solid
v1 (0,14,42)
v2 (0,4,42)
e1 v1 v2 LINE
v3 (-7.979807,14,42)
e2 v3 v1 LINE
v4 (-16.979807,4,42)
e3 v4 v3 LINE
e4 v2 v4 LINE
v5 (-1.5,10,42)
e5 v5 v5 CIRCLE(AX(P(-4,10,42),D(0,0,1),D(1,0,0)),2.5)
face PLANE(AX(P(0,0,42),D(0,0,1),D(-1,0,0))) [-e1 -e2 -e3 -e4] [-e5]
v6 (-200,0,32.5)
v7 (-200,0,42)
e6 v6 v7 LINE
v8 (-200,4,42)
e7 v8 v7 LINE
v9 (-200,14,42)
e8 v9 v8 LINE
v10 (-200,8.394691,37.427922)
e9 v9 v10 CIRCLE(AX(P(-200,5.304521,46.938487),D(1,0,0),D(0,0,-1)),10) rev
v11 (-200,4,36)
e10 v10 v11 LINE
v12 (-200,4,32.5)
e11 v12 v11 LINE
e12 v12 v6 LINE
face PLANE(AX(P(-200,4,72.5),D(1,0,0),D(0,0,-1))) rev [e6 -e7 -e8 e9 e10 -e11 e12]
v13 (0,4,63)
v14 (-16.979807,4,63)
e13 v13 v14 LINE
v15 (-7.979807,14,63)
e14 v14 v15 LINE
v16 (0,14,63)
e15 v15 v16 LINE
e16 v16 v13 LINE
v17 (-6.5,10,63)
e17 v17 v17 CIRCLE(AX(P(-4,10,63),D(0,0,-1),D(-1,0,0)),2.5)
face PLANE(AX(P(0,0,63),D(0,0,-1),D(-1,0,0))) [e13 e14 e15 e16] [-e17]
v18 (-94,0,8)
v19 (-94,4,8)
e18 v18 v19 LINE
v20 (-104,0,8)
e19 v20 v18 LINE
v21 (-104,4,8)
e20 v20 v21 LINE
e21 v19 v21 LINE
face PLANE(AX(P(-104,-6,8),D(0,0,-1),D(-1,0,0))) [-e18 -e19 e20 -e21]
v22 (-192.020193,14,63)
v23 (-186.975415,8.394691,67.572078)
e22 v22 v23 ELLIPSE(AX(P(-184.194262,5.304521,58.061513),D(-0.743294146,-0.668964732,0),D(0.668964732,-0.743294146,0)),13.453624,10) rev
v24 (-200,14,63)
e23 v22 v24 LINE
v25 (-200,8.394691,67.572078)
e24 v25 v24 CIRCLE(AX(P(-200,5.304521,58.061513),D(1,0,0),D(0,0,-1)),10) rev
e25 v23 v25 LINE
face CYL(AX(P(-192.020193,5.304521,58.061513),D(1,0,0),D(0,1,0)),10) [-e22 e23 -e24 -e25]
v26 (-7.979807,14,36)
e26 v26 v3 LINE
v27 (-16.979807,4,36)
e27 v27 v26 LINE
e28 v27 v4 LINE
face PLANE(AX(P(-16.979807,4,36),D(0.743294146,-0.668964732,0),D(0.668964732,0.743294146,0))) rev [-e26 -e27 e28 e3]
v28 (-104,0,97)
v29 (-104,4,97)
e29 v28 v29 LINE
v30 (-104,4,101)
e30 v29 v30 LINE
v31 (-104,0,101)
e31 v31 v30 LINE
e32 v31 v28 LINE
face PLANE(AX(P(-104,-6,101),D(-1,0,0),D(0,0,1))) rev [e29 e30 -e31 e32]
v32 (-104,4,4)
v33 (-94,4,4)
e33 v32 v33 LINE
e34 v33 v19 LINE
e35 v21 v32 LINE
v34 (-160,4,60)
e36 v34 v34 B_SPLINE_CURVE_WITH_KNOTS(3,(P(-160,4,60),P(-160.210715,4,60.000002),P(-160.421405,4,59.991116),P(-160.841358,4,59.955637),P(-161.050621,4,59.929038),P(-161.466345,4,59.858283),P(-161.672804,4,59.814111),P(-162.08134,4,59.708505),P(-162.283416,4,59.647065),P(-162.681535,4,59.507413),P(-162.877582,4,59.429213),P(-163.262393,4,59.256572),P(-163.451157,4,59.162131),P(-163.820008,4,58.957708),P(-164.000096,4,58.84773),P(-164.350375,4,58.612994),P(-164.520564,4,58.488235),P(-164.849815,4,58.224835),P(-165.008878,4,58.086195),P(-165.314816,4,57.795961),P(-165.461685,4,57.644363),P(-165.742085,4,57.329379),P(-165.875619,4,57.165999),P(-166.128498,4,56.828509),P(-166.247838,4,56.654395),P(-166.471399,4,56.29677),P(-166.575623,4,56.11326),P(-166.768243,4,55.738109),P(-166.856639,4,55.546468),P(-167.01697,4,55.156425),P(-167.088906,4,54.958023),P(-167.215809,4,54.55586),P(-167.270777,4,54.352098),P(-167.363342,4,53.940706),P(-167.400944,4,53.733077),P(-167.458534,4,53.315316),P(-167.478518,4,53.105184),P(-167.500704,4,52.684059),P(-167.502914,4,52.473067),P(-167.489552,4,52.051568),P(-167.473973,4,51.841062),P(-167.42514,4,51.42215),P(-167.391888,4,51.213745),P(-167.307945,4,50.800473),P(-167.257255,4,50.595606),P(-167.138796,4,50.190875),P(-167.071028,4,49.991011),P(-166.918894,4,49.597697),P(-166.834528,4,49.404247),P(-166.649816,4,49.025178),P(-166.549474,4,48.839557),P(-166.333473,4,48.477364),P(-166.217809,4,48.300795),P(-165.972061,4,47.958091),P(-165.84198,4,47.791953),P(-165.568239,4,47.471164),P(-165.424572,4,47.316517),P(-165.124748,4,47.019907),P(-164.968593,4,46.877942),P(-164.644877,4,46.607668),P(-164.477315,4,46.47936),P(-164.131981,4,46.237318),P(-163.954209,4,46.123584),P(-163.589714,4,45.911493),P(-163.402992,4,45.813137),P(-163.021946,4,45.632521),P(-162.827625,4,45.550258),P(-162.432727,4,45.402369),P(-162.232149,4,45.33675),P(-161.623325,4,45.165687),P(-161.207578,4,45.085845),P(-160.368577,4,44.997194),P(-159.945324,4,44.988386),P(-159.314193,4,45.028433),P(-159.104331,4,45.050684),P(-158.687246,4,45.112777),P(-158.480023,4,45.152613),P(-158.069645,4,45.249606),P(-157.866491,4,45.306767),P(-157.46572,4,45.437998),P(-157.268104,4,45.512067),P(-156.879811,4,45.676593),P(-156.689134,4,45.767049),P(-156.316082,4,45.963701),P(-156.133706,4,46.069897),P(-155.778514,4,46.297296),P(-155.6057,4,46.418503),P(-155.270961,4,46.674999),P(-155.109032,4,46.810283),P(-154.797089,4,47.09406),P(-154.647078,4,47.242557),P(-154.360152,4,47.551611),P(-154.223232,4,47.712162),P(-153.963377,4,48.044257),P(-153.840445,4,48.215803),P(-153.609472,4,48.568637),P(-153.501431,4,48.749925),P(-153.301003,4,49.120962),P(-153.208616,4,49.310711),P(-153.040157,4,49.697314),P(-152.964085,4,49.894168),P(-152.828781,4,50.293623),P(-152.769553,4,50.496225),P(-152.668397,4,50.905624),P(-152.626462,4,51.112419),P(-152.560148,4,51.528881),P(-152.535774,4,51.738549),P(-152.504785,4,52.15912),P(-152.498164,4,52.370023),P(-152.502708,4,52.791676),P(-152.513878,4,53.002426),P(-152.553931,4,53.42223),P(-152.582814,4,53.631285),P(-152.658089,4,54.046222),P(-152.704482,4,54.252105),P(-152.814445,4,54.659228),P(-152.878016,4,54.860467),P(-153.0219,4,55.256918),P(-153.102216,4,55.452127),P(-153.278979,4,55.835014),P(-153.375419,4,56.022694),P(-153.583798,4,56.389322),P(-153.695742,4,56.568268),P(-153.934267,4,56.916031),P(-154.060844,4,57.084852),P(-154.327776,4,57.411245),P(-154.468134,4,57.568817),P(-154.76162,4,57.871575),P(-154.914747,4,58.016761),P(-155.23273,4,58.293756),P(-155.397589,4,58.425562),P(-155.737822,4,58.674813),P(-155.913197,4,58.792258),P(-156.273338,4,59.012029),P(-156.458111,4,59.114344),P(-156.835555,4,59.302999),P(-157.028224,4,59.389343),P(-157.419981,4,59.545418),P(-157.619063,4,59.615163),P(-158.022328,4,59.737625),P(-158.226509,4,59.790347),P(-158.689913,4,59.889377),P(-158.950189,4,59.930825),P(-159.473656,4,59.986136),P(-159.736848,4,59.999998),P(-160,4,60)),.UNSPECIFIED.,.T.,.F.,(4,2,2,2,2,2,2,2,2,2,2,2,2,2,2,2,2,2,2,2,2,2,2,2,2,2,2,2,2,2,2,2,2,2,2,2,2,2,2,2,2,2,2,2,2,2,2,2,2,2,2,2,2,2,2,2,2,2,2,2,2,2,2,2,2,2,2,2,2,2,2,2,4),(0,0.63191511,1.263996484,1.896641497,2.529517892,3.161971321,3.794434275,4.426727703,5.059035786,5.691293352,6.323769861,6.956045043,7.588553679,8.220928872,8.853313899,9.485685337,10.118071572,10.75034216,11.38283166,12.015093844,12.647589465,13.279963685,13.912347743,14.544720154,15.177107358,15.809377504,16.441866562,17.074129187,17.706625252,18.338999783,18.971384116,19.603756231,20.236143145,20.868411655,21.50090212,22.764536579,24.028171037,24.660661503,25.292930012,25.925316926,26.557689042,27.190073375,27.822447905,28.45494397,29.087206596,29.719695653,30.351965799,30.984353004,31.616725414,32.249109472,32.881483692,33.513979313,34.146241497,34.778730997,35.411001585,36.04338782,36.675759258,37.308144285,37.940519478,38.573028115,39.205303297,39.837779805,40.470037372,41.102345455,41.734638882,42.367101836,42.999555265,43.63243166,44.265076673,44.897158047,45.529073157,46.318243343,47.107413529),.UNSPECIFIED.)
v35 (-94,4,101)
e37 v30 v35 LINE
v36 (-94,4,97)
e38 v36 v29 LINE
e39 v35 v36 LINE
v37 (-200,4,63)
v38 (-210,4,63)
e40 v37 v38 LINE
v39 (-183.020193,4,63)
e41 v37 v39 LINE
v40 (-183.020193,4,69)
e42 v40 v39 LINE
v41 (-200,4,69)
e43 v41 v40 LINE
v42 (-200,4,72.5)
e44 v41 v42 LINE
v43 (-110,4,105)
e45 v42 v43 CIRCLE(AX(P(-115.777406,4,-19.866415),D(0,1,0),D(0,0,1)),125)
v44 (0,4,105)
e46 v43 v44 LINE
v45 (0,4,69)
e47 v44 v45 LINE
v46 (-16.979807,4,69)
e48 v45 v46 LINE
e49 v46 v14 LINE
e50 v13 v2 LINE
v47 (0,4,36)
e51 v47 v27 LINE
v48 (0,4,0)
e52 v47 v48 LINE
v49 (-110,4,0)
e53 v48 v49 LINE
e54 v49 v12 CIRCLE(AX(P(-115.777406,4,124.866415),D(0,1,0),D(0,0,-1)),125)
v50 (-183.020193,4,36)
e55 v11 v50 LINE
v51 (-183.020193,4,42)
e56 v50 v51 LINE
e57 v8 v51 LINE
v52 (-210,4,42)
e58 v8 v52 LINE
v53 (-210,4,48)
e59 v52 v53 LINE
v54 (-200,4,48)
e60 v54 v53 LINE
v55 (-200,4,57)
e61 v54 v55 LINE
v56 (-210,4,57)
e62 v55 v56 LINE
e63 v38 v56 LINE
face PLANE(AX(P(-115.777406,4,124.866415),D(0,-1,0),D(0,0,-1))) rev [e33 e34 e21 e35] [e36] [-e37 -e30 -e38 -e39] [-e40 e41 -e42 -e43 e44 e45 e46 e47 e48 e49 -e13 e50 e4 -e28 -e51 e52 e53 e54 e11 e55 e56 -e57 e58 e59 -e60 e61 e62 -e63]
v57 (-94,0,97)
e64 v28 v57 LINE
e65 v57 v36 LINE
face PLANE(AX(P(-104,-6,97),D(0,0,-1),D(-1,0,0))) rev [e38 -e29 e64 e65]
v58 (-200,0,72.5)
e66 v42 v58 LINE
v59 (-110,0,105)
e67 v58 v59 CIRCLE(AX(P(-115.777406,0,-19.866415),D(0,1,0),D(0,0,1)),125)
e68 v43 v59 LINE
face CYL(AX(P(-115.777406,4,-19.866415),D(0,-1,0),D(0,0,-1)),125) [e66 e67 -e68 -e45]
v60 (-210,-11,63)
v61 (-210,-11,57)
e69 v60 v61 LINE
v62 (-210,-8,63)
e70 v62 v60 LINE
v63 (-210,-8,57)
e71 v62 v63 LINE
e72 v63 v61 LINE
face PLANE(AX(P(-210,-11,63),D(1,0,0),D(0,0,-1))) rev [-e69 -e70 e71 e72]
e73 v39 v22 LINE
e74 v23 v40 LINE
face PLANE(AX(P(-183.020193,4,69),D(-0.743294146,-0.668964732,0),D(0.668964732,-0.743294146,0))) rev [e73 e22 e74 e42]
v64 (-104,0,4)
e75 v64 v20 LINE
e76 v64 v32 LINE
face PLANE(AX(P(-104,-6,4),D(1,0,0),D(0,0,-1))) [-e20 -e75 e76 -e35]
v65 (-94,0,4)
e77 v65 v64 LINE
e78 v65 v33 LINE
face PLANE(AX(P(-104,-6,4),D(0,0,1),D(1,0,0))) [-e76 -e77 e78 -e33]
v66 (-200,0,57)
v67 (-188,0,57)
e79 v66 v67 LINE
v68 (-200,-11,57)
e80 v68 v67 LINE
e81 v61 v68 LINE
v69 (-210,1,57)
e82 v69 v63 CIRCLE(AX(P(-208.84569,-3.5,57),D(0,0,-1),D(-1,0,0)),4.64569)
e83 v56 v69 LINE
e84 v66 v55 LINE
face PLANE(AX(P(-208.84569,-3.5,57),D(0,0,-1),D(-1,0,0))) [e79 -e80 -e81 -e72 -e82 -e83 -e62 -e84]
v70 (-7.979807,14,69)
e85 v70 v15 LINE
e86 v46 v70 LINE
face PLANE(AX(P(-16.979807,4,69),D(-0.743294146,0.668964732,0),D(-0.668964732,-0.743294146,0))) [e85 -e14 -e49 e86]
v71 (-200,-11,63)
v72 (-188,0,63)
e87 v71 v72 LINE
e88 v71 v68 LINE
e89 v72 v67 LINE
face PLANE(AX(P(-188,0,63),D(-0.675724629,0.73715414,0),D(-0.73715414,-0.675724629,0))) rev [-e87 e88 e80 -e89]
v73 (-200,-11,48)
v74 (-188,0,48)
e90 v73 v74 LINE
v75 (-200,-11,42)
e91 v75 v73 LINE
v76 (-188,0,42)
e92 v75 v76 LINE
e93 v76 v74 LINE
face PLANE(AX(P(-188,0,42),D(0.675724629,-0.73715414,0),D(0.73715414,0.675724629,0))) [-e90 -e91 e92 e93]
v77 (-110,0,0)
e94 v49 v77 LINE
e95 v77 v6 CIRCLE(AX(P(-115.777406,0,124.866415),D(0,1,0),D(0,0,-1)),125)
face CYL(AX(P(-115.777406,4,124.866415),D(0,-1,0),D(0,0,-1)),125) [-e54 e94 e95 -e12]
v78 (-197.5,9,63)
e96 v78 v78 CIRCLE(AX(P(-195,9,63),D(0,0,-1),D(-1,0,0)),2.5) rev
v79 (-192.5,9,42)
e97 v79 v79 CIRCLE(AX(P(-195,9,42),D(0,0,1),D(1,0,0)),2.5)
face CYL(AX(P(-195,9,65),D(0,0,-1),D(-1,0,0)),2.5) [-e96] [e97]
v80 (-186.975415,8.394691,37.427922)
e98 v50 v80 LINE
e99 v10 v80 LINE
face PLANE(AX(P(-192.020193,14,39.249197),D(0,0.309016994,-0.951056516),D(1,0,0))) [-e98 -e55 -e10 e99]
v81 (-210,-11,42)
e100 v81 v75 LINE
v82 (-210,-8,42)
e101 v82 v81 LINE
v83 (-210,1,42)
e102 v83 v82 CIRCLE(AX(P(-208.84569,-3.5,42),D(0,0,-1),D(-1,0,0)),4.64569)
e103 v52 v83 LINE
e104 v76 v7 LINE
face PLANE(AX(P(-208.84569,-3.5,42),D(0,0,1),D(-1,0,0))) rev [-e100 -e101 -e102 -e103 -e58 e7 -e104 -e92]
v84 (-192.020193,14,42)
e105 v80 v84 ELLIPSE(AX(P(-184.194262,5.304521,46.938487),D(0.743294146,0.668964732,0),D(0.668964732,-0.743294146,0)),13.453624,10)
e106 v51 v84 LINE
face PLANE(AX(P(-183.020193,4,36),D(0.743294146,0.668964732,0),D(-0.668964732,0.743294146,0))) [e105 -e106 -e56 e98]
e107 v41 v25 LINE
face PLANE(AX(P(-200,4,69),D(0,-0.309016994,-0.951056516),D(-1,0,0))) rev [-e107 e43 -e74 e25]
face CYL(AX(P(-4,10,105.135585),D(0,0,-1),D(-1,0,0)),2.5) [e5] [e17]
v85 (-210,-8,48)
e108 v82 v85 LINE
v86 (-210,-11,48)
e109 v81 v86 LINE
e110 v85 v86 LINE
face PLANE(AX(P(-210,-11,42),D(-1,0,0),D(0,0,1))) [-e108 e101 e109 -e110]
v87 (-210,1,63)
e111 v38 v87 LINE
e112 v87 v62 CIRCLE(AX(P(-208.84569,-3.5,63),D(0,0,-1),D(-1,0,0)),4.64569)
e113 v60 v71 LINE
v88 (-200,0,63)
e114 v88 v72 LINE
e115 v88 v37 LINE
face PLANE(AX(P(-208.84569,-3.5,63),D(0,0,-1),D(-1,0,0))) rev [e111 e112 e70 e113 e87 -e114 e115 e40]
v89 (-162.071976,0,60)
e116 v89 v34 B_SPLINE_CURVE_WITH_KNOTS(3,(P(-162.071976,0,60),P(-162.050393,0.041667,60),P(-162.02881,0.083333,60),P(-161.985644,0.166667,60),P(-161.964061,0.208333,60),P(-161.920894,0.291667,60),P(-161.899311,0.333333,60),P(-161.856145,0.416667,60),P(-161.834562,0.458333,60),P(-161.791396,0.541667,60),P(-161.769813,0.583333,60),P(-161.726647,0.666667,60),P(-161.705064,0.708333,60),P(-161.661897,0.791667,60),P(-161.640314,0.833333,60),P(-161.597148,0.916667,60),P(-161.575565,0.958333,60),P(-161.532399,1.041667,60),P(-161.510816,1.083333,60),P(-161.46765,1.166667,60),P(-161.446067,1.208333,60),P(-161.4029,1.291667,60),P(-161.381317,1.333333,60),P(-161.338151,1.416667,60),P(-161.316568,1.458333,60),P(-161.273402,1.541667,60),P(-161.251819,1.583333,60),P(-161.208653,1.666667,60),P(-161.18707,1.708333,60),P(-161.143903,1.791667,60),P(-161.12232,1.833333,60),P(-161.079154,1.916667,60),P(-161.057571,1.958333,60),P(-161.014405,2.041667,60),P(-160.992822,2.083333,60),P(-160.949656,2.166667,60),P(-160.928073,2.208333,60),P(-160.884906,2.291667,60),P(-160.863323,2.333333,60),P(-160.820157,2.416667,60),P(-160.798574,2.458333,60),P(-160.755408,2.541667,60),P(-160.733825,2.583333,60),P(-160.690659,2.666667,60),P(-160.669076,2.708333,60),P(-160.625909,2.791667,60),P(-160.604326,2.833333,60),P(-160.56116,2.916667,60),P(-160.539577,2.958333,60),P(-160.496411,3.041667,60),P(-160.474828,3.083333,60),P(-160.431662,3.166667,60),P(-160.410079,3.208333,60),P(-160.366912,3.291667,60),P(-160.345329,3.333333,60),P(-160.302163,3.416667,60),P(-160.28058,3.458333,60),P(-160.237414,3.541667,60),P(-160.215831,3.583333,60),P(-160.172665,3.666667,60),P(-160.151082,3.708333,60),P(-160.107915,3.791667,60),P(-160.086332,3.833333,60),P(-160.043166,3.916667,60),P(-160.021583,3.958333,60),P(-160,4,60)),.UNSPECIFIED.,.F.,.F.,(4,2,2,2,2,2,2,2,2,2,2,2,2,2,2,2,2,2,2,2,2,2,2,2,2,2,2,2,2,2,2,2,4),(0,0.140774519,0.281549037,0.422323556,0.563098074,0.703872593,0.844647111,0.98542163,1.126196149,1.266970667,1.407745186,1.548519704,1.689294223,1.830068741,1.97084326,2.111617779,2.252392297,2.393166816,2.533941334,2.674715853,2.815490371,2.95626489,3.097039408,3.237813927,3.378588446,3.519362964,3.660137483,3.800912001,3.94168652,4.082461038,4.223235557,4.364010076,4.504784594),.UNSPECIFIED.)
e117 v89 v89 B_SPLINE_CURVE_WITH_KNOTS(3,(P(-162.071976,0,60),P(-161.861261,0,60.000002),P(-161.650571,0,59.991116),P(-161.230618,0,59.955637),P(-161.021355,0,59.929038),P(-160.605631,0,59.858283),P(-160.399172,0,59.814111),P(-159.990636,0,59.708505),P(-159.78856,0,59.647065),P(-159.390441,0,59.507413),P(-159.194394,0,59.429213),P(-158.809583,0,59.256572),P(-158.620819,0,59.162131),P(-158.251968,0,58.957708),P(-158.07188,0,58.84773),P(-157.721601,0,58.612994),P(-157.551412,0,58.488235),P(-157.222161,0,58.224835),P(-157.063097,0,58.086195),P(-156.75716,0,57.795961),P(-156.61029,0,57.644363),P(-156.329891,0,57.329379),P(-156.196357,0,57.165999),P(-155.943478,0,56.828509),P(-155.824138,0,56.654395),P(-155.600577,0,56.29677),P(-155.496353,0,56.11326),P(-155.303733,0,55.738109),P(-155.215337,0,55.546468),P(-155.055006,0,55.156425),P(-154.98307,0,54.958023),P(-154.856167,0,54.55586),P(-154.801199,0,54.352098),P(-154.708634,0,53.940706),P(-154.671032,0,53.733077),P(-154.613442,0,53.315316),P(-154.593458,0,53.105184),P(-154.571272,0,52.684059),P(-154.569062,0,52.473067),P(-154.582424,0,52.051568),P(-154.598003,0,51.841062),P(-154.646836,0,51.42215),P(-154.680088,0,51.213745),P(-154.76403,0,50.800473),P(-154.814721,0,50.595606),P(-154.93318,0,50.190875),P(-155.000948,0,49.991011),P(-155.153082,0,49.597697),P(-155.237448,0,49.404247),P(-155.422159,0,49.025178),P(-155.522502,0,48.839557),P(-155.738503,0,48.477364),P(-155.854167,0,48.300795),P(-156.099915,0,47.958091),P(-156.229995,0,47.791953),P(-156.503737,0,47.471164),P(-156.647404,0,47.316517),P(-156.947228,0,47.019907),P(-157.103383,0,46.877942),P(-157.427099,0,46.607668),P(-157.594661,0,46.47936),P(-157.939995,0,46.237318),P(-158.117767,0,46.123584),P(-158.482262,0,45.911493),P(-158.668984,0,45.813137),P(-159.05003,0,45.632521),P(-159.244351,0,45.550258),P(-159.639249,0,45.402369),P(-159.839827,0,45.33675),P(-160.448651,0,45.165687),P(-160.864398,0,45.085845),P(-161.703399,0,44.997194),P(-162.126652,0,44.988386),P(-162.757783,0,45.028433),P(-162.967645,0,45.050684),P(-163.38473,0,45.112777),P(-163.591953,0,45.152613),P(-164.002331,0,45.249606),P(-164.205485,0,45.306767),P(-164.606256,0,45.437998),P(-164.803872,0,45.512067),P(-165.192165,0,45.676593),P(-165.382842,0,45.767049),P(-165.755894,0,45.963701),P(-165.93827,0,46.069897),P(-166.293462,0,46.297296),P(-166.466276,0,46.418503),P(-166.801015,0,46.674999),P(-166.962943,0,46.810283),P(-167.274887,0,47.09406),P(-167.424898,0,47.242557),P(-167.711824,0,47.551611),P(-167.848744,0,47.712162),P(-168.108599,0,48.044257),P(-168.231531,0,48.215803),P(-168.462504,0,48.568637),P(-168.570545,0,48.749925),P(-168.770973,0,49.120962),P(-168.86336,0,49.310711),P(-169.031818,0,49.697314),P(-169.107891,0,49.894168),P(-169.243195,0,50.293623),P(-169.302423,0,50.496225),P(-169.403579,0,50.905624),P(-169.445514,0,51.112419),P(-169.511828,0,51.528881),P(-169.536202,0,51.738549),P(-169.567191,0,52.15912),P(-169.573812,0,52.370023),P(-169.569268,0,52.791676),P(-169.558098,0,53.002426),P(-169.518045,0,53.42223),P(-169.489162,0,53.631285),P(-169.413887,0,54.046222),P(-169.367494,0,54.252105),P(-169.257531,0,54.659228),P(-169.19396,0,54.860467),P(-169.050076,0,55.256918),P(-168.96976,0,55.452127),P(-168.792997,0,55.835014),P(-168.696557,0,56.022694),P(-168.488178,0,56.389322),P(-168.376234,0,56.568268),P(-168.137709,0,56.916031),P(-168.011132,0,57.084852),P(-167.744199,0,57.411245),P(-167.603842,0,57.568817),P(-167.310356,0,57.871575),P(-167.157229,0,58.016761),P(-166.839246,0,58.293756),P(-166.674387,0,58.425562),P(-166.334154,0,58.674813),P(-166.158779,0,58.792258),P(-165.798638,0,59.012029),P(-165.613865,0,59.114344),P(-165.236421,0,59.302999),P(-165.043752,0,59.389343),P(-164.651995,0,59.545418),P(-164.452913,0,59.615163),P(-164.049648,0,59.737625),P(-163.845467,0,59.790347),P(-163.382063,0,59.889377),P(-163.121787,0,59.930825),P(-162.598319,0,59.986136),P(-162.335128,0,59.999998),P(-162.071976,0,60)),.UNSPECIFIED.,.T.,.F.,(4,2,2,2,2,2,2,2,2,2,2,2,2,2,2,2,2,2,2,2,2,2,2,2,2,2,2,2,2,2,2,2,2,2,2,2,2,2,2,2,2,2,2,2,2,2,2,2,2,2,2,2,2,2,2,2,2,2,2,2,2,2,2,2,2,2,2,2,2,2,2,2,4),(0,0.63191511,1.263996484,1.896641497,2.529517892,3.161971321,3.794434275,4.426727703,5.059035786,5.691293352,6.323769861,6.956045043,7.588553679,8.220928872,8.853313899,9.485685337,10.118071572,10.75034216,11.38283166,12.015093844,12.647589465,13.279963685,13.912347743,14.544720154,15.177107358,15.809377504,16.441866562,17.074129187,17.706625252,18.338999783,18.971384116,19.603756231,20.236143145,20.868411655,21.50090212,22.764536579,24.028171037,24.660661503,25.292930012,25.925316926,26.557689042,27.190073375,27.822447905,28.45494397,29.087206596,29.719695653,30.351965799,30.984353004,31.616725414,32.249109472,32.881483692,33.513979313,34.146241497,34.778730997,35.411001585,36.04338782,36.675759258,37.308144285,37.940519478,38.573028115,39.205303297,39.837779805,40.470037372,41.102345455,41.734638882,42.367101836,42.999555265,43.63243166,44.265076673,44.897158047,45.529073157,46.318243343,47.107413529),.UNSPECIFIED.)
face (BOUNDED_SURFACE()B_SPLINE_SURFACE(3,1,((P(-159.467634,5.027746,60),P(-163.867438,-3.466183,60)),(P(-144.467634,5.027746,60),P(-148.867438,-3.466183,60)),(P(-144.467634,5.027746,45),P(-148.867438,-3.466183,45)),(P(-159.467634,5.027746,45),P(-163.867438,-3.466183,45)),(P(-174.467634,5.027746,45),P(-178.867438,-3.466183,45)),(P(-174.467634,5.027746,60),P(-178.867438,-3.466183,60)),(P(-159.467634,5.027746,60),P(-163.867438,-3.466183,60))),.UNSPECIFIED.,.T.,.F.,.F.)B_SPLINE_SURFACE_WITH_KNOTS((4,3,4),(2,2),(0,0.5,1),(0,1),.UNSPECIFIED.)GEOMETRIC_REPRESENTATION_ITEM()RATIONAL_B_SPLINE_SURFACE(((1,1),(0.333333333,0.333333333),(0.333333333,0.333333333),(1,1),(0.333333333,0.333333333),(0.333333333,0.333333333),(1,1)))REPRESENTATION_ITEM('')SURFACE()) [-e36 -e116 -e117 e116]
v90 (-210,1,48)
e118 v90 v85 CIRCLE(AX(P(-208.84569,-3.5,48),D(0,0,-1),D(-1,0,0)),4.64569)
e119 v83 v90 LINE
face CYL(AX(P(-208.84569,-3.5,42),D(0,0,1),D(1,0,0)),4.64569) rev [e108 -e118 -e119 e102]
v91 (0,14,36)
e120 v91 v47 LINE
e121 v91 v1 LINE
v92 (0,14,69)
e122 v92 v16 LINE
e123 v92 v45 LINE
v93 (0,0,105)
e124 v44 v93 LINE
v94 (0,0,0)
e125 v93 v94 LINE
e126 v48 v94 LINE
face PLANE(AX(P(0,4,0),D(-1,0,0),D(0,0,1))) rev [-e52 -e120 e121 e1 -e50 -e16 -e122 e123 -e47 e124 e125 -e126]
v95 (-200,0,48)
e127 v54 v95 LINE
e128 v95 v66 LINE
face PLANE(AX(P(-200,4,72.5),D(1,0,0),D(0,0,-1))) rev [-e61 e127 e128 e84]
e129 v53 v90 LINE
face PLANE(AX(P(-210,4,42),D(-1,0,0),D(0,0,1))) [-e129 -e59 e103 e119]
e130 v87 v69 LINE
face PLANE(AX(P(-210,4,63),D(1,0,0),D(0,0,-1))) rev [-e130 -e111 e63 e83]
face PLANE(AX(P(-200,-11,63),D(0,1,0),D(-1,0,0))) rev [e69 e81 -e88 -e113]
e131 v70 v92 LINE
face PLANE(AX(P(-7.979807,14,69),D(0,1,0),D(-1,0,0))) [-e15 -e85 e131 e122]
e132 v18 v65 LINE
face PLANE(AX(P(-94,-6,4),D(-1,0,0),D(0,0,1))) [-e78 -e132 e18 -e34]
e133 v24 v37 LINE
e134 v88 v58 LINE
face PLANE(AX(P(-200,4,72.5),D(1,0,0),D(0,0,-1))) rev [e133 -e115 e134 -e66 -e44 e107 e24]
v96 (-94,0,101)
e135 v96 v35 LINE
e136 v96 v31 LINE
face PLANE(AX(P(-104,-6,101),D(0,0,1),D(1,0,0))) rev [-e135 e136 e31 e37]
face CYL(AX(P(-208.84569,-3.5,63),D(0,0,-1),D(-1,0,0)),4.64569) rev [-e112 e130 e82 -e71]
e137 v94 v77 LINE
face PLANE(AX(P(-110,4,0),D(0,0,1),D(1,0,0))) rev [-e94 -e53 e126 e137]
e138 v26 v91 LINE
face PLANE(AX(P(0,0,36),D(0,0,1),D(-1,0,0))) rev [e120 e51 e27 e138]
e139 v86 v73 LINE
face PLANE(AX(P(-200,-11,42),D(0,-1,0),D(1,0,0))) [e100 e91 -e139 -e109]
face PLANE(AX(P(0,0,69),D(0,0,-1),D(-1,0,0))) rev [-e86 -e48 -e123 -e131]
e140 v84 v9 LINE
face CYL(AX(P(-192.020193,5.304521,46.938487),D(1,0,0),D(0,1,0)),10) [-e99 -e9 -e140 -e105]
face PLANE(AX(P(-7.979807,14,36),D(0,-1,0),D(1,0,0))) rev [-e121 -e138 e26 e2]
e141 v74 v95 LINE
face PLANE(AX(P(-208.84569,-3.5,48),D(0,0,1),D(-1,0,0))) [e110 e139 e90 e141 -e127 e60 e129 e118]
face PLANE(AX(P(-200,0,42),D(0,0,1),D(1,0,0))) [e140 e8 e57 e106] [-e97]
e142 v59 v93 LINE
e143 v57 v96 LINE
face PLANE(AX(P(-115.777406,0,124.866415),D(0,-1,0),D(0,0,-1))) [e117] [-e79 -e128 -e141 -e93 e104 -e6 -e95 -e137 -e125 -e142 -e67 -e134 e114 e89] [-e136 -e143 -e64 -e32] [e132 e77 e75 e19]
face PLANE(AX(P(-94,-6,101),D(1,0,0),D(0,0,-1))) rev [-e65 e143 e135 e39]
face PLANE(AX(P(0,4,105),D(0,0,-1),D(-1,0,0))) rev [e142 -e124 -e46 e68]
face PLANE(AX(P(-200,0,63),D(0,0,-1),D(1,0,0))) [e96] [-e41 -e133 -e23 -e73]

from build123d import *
from OCP.BRepFilletAPI import BRepFilletAPI_MakeChamfer

# Parameters (mm, degrees)
BOSS_EXTRUDE1_DEPTH  = 4
BOSS_EXTRUDE2_START  = -45
BOSS_EXTRUDE2_DEPTH  = 3
BOSS_EXTRUDE3_START  = -39
BOSS_EXTRUDE3_DEPTH  = 3
BOSS_EXTRUDE4_REACH  = 221.731
SKETCH6_R            = 2.5
SKETCH7_W            = 10
SKETCH7_H            = 4
CUT_EXTRUDE1_DEPTH   = 10
SKETCH8_R            = 7.5
MIRROR6_START        = -39
MIRROR6_COPY_1_DEPTH = 3
CHAMFER1_SIZE        = 10
CHAMFER1_SIZE_2      = 3.249196962
FILLET1_R            = 10
SKETCH10_R           = 2.5
BOSS_EXTRUDE6_DEPTH  = 23


# Some blends are built 0.0001 mm under size
with BuildPart() as part:
    # Sketch1 → Boss-Extrude1 (new body)
    with BuildSketch(Plane(origin=(0, 0, 0), x_dir=(1, 0, 0), z_dir=(0, 1, 0))):
        with BuildLine():
            Line((-110, 0), (0, 0))
            Line((0, 0), (0, -105))
            Line((0, -105), (-110, -105))
            ThreePointArc((-110, -105), (-158.232963684, -97.702822508), (-200, -72.5))
            Line((-200, -72.5), (-200, -32.5))
            ThreePointArc((-200, -32.5), (-158.232963684, -7.297177492), (-110, 0))
        make_face()
    extrude(amount=BOSS_EXTRUDE1_DEPTH)

    # Sketch2 → Boss-Extrude2 (add, symmetric)
    with BuildSketch(Plane.XY.offset(105).offset(BOSS_EXTRUDE2_START)):
        with BuildLine():
            Line((-200, 4), (-210, 4))
            Line((-210, 4), (-210, 1))
            ThreePointArc((-210, 1), (-204.2, -3.5), (-210, -8))
            Line((-210, -8), (-210, -11))
            Line((-210, -11), (-200, -11))
            Line((-200, -11), (-188, 0))
            Line((-188, 0), (-200, 4))
        make_face()
    boss_extrude2 = extrude(amount=BOSS_EXTRUDE2_DEPTH, both=True)

    # Mirror1: Boss-Extrude2 across plane
    add(boss_extrude2.mirror(Plane.XY.offset(52.5)))

    # Sketch5 → Boss-Extrude3 (add, symmetric)
    with BuildSketch(Plane.XY.offset(105).offset(BOSS_EXTRUDE3_START)):
        Polygon((-16.979807258, 4), (-7.979807258, 14), (0, 14), (0, 4), align=None)
    boss_extrude3 = extrude(amount=BOSS_EXTRUDE3_DEPTH, both=True)

    # Mirror4: Boss-Extrude3 across plane
    add(boss_extrude3.mirror(Plane.XY.offset(52.5)))

    # Sketch6 → Boss-Extrude4 (add, up to next)
    with BuildSketch(Plane.XY.offset(42), mode=Mode.PRIVATE) as boss_extrude4_sk1:
        with Locations(Location((-4, 10, 0), (0, 0, 180))):
            Circle(SKETCH6_R)
    boss_extrude4_tool1 = extrude(boss_extrude4_sk1.sketch, amount=BOSS_EXTRUDE4_REACH, mode=Mode.PRIVATE) - part.part
    add(boss_extrude4_tool1.solids().sort_by_distance((-4, 10, 42))[0])

    # Sketch7 → Cut-Extrude1 (cut)
    with BuildSketch(Plane(origin=(0, 4, 0), x_dir=(1, 0, 0), z_dir=(0, 1, 0))):
        with Locations((-99, -99)):
            Rectangle(SKETCH7_W, SKETCH7_H)
    cut_extrude1 = extrude(amount=-CUT_EXTRUDE1_DEPTH, mode=Mode.SUBTRACT)

    # Mirror5: Cut-Extrude1 across plane
    add(cut_extrude1.mirror(Plane.XY.offset(52.5)), mode=Mode.SUBTRACT)

    # Cut-Sweep1: sweep along a path in Sketch9
    with BuildLine(Plane.XY.offset(52.5)) as cut_sweep1_path:
        Line((-160, 4), (-163.867437875, -3.466183031))
    # Sketch8 → Cut-Sweep1 (sweep, cut)
    with BuildSketch(Plane(origin=(0, 4, 0), x_dir=(1, 0, 0), z_dir=(0, 1, 0))):
        with Locations((-160, -52.5)):
            Circle(SKETCH8_R)
    sweep(path=cut_sweep1_path.line, mode=Mode.SUBTRACT)

    # Mirror6: Boss-Extrude3 across plane
    add(boss_extrude3.mirror(Plane(origin=(-100, 0, 0), x_dir=(0, 0, 1), z_dir=(1, 0, 0))))

    # Mirror6 copy 1 sketch → Mirror6 copy 1 (add, symmetric)
    with BuildSketch(Plane(origin=(-200, 0, 0), x_dir=(-1, 0, 0), z_dir=(0, 0, -1)).offset(MIRROR6_START)):
        Polygon((-16.979807258, 4), (-7.979807258, 14), (0, 14), (0, 4), align=None)
    extrude(amount=MIRROR6_COPY_1_DEPTH, both=True)

    # Chamfer1
    chamfer1_edges_1 = [part.edges().sort_by_distance(p)[0] for p in [
        (-196.010096371, 14, 69),
    ]]
    chamfer1_side_1 = [part.faces().sort_by_distance(p)[0] for p in [
        (-196.010096371, 13.935016061, 69),
    ]]
    chamfer1_edges_2 = [part.edges().sort_by_distance(p)[0] for p in [
        (-196.010096371, 14, 36),
    ]]
    chamfer1_side_2 = [part.faces().sort_by_distance(p)[0] for p in [
        (-196.010096371, 13.935016061, 36),
    ]]
    chamfer1 = BRepFilletAPI_MakeChamfer(part.part.solid().wrapped)
    for e in chamfer1_edges_1:
        chamfer1.Add(CHAMFER1_SIZE - 0.0001, CHAMFER1_SIZE_2 - 0.0001, e.wrapped, chamfer1_side_1[0].wrapped)
    for e in chamfer1_edges_2:
        chamfer1.Add(CHAMFER1_SIZE - 0.0001, CHAMFER1_SIZE_2 - 0.0001, e.wrapped, chamfer1_side_2[0].wrapped)
    add(Compound.cast(chamfer1.Shape()), mode=Mode.REPLACE)  # a hair under: the kernel refuses the full size

    # Fillet1
    # the kernel refuses this fillet: 10 mm, written as the material it takes off along each edge
    with BuildSketch(Plane(origin=(-177.285530003, 14, 39.249096962), x_dir=(0, 0, 1), z_dir=(-1, 0, 0))) as fillet1_piece_1:
        with BuildLine():
            CenterArc((7.689313783, -8.695521796), FILLET1_R, 119.593358477, 42.406991386)
            Line((-1.821270249, -5.605409927), (-2.01148193, -5.543607689))
            Line((-2.01148193, -5.543607689), (-0.190211681, 0.061802237))
            Line((-0.190211681, 0.061802237), (0, 0.2))
            ThreePointArc((0, 0.2), (1.375451519, 0.2), (2.652134823, 0.173910436))
            Line((2.652134823, 0.173910436), (2.750903038, 0))
        make_face()
    extrude(amount=37.449132737, mode=Mode.SUBTRACT)
    with BuildSketch(Plane(origin=(-177.285530003, 14, 65.750903038), x_dir=(0, 0, -1), z_dir=(-1, 0, 0))) as fillet1_piece_2:
        with BuildLine():
            CenterArc((7.689313783, 8.695521796), FILLET1_R, 197.999650137, 42.406991386)
            Line((-1.821270249, 5.605409927), (-2.01148193, 5.543607689))
            Line((-2.01148193, 5.543607689), (-0.190211681, -0.061802237))
            Line((-0.190211681, -0.061802237), (0, -0.2))
            ThreePointArc((0, -0.2), (1.375451519, -0.2), (2.652134823, -0.173910436))
            Line((2.652134823, -0.173910436), (2.750903038, 0))
        make_face()
    extrude(amount=37.449132737, mode=Mode.SUBTRACT)

    # Sketch10 → Boss-Extrude6 (add)
    with BuildSketch(Plane.XY.offset(42)):
        with Locations(Location((-195, 9, 0), (0, 0, 180))):
            Circle(SKETCH10_R)
    extrude(amount=BOSS_EXTRUDE6_DEPTH)


solid = part.part
